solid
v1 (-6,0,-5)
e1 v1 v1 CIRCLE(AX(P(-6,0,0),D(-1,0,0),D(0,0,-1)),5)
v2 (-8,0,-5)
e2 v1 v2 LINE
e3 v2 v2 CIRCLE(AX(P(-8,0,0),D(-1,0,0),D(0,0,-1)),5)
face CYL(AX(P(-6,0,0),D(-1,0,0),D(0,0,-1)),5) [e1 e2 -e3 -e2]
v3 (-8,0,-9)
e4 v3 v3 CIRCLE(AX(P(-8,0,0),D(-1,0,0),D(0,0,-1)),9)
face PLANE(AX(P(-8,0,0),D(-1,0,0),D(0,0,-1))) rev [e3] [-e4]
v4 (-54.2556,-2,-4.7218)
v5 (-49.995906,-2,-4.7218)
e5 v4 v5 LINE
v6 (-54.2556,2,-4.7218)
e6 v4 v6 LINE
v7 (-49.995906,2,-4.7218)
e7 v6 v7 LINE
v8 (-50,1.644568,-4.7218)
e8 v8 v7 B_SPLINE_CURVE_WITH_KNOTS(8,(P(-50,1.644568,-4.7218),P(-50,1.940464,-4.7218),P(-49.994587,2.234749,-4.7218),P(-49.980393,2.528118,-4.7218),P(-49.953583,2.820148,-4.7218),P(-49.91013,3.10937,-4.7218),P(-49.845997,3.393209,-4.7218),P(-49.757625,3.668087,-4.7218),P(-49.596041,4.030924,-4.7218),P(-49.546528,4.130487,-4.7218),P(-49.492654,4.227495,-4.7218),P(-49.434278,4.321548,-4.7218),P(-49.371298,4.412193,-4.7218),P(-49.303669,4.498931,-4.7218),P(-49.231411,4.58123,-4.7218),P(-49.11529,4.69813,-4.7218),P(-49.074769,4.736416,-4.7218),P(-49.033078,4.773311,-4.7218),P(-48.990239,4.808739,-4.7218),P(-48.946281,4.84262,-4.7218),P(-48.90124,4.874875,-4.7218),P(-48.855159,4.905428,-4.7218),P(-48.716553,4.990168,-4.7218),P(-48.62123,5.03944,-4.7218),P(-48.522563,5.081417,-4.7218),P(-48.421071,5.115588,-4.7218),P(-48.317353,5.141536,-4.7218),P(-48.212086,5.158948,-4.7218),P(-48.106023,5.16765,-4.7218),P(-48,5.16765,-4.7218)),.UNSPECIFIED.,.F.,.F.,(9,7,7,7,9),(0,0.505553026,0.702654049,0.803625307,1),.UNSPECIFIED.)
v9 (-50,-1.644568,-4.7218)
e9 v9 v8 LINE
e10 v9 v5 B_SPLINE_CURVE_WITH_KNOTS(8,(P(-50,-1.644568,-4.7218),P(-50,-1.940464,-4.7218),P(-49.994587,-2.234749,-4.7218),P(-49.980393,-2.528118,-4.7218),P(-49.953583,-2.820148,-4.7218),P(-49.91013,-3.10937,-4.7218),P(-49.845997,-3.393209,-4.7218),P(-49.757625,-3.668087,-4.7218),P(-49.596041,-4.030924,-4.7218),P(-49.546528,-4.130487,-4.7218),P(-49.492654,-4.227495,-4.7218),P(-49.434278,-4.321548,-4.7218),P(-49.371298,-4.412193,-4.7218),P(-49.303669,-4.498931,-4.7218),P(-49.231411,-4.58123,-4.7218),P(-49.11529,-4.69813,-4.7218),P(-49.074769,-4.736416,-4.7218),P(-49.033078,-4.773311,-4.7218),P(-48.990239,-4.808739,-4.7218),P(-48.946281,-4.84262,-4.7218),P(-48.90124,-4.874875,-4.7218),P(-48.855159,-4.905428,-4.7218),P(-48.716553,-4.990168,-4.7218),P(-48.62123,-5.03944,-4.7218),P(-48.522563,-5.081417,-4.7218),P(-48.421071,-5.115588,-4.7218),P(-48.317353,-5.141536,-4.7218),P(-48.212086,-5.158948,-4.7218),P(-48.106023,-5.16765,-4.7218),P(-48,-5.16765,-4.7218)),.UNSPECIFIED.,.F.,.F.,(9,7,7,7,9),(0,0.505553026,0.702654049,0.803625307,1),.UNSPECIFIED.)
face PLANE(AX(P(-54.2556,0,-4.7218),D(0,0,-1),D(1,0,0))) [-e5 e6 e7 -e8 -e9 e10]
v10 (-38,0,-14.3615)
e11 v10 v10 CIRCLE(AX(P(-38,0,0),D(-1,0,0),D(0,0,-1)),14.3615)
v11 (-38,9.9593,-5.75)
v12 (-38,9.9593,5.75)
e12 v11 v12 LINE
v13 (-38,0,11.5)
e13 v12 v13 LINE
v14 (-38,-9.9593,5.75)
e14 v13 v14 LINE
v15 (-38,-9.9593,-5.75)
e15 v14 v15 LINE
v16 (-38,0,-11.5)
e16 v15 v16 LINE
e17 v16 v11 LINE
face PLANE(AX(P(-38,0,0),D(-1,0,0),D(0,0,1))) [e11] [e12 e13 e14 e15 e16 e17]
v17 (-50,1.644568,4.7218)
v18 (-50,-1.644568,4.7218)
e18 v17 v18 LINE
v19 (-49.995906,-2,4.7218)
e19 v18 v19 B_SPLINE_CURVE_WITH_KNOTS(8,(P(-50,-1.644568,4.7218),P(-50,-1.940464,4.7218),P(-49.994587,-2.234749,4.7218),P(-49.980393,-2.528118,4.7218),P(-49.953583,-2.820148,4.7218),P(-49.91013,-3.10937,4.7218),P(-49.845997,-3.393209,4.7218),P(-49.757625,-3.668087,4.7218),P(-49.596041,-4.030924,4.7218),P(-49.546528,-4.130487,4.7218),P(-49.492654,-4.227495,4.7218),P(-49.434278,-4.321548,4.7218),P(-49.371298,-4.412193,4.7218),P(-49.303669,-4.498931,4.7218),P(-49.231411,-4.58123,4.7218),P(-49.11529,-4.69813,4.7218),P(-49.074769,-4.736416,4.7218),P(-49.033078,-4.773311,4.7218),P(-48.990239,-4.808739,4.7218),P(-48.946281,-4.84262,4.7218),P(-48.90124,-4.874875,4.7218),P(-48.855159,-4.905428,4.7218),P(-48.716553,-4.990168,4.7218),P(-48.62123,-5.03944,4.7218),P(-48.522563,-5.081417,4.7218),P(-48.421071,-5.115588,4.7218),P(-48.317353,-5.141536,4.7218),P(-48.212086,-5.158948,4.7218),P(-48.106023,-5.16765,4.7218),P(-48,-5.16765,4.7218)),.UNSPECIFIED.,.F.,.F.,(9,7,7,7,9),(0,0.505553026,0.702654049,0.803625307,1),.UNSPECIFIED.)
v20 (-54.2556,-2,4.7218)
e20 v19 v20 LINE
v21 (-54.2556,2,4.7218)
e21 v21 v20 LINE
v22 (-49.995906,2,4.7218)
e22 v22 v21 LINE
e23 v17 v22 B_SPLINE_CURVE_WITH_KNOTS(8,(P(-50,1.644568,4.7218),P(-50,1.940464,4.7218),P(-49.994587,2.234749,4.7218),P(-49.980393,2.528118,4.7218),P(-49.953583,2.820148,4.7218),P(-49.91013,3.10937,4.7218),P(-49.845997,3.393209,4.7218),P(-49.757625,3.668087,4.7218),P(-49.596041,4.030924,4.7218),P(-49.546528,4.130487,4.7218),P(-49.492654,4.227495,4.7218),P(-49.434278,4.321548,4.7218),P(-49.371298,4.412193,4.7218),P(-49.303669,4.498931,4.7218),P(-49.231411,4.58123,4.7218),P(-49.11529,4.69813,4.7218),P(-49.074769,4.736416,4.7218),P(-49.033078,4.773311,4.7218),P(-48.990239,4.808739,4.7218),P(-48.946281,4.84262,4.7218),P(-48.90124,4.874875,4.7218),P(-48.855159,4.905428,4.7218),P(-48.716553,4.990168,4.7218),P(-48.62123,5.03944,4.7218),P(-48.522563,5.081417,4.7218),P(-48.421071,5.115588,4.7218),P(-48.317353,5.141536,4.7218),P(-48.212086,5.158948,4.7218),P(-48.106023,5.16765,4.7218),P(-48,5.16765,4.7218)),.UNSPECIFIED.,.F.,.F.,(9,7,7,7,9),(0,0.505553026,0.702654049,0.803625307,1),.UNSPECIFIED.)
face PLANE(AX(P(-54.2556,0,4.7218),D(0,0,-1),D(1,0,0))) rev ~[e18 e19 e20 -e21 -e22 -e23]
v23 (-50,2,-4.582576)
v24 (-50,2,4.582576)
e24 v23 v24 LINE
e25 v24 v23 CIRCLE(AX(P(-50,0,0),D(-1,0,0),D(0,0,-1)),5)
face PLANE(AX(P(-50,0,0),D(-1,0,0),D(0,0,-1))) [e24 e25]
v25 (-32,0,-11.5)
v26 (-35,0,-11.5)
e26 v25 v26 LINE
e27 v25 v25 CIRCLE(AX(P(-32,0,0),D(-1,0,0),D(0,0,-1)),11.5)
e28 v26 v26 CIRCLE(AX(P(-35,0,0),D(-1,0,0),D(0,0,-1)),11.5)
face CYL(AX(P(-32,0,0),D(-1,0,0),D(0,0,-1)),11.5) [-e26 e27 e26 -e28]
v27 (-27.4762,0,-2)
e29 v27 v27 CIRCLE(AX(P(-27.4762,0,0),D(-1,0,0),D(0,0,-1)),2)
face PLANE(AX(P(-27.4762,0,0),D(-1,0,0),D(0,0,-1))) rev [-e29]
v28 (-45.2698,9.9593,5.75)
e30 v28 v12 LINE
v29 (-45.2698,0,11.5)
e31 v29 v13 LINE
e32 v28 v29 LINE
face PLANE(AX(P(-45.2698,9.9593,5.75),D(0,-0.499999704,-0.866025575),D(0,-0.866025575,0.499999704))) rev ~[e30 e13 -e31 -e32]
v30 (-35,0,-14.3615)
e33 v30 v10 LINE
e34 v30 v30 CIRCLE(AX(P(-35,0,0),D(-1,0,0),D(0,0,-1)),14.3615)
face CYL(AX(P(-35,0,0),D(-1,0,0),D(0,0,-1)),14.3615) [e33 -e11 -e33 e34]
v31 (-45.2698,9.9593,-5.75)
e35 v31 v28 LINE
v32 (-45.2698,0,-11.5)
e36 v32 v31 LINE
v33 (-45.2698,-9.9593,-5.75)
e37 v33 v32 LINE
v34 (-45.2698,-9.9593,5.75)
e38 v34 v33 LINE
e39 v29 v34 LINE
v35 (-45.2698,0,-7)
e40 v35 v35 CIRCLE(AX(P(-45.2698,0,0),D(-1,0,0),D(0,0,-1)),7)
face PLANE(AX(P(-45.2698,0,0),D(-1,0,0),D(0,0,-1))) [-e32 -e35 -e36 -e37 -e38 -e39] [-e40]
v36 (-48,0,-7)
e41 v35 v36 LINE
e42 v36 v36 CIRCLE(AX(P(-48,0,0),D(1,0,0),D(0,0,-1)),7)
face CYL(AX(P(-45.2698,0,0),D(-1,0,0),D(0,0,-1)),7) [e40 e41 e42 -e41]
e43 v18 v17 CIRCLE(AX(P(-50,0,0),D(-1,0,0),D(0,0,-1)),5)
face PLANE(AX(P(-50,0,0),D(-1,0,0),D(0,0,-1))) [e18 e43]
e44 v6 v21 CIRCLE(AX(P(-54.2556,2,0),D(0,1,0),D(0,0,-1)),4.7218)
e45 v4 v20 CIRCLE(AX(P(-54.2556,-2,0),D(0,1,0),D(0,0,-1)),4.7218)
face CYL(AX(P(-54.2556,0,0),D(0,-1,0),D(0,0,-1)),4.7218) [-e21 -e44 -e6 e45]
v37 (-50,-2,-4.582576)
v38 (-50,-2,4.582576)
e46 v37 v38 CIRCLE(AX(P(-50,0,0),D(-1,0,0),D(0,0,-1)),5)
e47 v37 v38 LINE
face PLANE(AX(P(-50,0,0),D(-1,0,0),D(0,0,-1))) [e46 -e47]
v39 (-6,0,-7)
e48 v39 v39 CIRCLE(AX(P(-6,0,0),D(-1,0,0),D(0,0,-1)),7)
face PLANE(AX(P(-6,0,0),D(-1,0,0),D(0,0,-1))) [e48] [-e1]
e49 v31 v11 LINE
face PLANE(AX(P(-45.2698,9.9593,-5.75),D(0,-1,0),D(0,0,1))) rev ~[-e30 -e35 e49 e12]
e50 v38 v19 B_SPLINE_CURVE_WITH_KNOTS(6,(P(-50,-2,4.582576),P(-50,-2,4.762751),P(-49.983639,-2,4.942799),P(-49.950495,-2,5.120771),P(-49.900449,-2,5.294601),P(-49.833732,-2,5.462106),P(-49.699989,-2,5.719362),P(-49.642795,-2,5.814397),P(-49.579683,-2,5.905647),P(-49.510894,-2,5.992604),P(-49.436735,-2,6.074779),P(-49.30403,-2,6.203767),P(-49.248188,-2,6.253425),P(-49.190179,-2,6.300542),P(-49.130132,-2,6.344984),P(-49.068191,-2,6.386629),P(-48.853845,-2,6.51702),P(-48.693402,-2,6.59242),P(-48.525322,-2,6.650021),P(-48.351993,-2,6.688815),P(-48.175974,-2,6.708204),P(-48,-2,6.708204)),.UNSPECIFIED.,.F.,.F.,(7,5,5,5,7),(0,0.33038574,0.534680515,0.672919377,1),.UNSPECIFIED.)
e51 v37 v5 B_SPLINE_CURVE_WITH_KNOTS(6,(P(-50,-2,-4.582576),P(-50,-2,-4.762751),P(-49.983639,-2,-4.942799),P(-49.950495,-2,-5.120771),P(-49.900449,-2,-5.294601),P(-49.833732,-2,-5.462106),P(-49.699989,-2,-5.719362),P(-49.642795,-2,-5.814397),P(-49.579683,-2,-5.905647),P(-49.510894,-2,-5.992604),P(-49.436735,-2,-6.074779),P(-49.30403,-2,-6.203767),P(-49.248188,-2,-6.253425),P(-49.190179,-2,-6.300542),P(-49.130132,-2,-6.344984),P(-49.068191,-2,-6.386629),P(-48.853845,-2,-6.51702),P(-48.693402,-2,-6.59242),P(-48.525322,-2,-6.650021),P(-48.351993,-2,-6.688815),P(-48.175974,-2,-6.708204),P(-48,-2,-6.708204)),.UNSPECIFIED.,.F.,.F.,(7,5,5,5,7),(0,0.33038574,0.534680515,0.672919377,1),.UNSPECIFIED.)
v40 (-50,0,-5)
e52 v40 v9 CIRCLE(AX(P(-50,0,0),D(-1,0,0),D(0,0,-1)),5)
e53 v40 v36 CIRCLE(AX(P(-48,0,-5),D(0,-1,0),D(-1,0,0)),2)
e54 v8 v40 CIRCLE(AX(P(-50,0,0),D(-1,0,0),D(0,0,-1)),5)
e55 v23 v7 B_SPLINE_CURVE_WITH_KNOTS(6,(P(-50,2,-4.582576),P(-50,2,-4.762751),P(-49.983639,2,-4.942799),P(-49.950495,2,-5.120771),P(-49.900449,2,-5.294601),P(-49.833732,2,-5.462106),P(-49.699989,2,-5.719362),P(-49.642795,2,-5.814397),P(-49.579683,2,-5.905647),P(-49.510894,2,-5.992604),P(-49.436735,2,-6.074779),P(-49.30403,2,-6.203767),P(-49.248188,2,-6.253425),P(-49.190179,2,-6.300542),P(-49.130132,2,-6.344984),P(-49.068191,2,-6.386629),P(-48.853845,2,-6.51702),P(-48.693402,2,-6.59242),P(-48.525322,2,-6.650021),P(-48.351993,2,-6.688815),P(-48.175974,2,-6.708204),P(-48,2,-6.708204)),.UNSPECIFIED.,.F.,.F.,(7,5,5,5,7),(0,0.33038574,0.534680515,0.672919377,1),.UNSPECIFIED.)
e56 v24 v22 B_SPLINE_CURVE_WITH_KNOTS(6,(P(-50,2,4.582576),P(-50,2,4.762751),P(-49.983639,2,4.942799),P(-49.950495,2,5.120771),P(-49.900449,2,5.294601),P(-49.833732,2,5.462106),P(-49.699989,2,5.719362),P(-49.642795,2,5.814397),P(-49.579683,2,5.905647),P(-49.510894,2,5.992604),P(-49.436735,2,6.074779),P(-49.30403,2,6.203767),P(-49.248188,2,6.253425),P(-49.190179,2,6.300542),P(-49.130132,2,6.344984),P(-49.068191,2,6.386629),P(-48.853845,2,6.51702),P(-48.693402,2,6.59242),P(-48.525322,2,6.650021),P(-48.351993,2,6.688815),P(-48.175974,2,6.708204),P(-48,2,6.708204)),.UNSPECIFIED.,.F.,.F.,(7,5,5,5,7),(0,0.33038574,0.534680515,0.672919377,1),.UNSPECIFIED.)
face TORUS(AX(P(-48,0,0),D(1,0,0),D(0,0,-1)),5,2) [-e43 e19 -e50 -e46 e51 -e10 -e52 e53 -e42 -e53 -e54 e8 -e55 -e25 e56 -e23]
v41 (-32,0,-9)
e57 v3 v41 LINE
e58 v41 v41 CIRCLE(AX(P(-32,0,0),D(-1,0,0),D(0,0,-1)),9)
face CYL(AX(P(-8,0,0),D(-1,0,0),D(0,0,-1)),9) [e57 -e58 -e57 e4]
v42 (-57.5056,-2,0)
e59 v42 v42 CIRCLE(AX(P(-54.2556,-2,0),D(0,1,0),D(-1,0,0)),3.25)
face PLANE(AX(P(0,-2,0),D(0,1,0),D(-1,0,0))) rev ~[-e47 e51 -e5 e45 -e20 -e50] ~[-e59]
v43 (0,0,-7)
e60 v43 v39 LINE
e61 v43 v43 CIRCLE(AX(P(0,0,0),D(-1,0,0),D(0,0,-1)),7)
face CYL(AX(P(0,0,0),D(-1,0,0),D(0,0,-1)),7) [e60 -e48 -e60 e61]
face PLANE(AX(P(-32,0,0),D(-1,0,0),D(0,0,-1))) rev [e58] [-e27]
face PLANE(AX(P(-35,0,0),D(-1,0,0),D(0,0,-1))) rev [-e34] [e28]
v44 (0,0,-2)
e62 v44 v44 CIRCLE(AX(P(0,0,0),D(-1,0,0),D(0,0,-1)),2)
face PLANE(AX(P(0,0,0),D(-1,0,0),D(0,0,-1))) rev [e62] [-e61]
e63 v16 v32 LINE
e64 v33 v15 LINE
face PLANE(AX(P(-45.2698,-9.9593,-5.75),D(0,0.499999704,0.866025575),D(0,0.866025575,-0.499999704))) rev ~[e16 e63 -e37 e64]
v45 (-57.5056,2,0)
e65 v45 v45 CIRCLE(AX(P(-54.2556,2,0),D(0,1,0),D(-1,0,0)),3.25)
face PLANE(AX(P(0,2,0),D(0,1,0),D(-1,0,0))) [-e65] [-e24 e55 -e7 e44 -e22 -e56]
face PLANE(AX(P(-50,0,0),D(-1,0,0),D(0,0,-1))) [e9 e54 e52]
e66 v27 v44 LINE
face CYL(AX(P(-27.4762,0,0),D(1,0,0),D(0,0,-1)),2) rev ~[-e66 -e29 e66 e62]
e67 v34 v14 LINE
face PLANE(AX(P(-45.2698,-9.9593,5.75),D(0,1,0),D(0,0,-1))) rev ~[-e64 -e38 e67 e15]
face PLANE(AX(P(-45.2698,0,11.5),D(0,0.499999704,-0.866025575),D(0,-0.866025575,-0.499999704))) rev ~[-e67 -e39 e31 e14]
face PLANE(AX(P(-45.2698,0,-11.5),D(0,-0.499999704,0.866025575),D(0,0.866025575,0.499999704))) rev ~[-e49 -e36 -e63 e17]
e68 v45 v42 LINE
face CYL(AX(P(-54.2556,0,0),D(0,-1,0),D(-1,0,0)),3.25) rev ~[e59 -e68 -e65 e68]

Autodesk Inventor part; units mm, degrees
ref_plane "YZ Plane" through (0, 0, 0) normal (1, 0, 0) x (0, 1, 0)
ref_plane "XZ Plane" through (0, 0, 0) normal (0, 1, 0) x (-1, 0, 0)
ref_plane "XY Plane" through (0, 0, 0) normal (0, 0, 1) x (1, 0, 0)
sketch "Sketch1" plane through (0, 0, 0) normal (0, 1, 0) x (-1, 0, 0)
  line L0 (0, 0) -> (50, 0)
  line L1 (0, 0) -> (0, -7)
  line L2 (0, -7) -> (6, -7)
  line L3 (6, -7) -> (6, -5)
  line L4 (6, -5) -> (8, -5)
  line L5 (8, -5) -> (8, -9)
  line L6 (8, -9) -> (32, -9)
  line L7 (32, -9) -> (32, -11.5)
  line L8 (32, -11.5) -> (35, -11.5)
  line L9 (35, -11.5) -> (35, -14.3615)
  line L10 (35, -14.3615) -> (38, -14.3615)
  line L11 (38, -14.3615) -> (38, -11.5)
  line L12 (38, -11.5) -> (45.2698, -11.5)
  line L13 (45.2698, -11.5) -> (45.2698, -7)
  line L14 (45.2698, -7) -> (50, -7)
  line L15 (50, -7) -> (50, 0)
  line L16 (0, 0) -> (27.4762, 0)
  line L17 (27.4762, 0) -> (27.4762, -2)
  line L18 (27.4762, -2) -> (0, -2)
  line L19 (0, -2) -> (0, 0)
  point P0 (7, -5)
  point P1 (32, -10.25)
  dimension "d0" = 50
  dimension "d1" = 7
  dimension "d2" = 6
  dimension "d3" = 2
  dimension "d4" = 5
  dimension "d6" = 24
  dimension "d7" = 3
  dimension "d8" = 3
  dimension "d9" = 11.5
  dimension "d10" = 9
  dimension "d12" = 2
revolve "Revolution1" add sketch "Sketch1" angle 360 about axis through (0, 0, 0) along (-1, 0, 0) contours L0 L15 L14 L13 L12 L11 L10 L9 L8 L7 L6 L5 L4 L3 L2 L1 L18 L17
sketch "Sketch2" plane through (0, 0, 0) normal (0, 1, 0) x (-1, 0, 0)
  line L0 (50, -7) -> (50, 7) projected
  line L1 (45.2698, -7) -> (45.2698, 7) projected
  circle A0 centre (54.2556, 0) radius 3.25
  arc A1 (54.2556, -4.7218) -> (54.2556, 4.7218) centre (54.2556, 0) ccw
  line L2 (54.2556, 4.7218) -> (50, 4.7218)
  line L3 (54.2556, -4.7218) -> (50, -4.7218)
  point P0 (0, 0)
  dimension "d13" = 6.5
extrude "Extrusion1" add sketch "Sketch2" along normal mid plane 4
fillet "Fillet1" radius 2 1 edges at (-50, 0, 7)
sketch "Sketch3" plane through (-45.2698, 0, 0) normal (-1, 0, 0) x (0, 0, 1)
  circle A0 centre (0, 0) radius 11.5 projected
  circle A1 centre (0, 0) radius 2 projected
  line L0 (11.5, 0) -> (5.75, -9.9593)
  line L1 (5.75, -9.9593) -> (-5.75, -9.9593)
  line L2 (-5.75, -9.9593) -> (-11.5, 0)
  line L3 (-11.5, 0) -> (-5.75, 9.9593)
  line L4 (-5.75, 9.9593) -> (5.75, 9.9593)
  line L5 (5.75, 9.9593) -> (11.5, 0)
  point P0 (-11.5, 0)
  point P1 (-11.5, 0)
  point P2 (-5.75, -9.9593)
  point P3 (-5.75, -9.9593)
extrude "Extrusion2" cut sketch "Sketch3" against normal up to surface (7.2698 mm away) contours L5 A0 | A0 L0 | L4 A0 | A0 L1 | L3 A0 | A0 L2
thread "Thread1" size "5-40 UNC" class "2A" standard "ANSI Unified Screw Threads" full length
properties part number "100MMshockUpper"
